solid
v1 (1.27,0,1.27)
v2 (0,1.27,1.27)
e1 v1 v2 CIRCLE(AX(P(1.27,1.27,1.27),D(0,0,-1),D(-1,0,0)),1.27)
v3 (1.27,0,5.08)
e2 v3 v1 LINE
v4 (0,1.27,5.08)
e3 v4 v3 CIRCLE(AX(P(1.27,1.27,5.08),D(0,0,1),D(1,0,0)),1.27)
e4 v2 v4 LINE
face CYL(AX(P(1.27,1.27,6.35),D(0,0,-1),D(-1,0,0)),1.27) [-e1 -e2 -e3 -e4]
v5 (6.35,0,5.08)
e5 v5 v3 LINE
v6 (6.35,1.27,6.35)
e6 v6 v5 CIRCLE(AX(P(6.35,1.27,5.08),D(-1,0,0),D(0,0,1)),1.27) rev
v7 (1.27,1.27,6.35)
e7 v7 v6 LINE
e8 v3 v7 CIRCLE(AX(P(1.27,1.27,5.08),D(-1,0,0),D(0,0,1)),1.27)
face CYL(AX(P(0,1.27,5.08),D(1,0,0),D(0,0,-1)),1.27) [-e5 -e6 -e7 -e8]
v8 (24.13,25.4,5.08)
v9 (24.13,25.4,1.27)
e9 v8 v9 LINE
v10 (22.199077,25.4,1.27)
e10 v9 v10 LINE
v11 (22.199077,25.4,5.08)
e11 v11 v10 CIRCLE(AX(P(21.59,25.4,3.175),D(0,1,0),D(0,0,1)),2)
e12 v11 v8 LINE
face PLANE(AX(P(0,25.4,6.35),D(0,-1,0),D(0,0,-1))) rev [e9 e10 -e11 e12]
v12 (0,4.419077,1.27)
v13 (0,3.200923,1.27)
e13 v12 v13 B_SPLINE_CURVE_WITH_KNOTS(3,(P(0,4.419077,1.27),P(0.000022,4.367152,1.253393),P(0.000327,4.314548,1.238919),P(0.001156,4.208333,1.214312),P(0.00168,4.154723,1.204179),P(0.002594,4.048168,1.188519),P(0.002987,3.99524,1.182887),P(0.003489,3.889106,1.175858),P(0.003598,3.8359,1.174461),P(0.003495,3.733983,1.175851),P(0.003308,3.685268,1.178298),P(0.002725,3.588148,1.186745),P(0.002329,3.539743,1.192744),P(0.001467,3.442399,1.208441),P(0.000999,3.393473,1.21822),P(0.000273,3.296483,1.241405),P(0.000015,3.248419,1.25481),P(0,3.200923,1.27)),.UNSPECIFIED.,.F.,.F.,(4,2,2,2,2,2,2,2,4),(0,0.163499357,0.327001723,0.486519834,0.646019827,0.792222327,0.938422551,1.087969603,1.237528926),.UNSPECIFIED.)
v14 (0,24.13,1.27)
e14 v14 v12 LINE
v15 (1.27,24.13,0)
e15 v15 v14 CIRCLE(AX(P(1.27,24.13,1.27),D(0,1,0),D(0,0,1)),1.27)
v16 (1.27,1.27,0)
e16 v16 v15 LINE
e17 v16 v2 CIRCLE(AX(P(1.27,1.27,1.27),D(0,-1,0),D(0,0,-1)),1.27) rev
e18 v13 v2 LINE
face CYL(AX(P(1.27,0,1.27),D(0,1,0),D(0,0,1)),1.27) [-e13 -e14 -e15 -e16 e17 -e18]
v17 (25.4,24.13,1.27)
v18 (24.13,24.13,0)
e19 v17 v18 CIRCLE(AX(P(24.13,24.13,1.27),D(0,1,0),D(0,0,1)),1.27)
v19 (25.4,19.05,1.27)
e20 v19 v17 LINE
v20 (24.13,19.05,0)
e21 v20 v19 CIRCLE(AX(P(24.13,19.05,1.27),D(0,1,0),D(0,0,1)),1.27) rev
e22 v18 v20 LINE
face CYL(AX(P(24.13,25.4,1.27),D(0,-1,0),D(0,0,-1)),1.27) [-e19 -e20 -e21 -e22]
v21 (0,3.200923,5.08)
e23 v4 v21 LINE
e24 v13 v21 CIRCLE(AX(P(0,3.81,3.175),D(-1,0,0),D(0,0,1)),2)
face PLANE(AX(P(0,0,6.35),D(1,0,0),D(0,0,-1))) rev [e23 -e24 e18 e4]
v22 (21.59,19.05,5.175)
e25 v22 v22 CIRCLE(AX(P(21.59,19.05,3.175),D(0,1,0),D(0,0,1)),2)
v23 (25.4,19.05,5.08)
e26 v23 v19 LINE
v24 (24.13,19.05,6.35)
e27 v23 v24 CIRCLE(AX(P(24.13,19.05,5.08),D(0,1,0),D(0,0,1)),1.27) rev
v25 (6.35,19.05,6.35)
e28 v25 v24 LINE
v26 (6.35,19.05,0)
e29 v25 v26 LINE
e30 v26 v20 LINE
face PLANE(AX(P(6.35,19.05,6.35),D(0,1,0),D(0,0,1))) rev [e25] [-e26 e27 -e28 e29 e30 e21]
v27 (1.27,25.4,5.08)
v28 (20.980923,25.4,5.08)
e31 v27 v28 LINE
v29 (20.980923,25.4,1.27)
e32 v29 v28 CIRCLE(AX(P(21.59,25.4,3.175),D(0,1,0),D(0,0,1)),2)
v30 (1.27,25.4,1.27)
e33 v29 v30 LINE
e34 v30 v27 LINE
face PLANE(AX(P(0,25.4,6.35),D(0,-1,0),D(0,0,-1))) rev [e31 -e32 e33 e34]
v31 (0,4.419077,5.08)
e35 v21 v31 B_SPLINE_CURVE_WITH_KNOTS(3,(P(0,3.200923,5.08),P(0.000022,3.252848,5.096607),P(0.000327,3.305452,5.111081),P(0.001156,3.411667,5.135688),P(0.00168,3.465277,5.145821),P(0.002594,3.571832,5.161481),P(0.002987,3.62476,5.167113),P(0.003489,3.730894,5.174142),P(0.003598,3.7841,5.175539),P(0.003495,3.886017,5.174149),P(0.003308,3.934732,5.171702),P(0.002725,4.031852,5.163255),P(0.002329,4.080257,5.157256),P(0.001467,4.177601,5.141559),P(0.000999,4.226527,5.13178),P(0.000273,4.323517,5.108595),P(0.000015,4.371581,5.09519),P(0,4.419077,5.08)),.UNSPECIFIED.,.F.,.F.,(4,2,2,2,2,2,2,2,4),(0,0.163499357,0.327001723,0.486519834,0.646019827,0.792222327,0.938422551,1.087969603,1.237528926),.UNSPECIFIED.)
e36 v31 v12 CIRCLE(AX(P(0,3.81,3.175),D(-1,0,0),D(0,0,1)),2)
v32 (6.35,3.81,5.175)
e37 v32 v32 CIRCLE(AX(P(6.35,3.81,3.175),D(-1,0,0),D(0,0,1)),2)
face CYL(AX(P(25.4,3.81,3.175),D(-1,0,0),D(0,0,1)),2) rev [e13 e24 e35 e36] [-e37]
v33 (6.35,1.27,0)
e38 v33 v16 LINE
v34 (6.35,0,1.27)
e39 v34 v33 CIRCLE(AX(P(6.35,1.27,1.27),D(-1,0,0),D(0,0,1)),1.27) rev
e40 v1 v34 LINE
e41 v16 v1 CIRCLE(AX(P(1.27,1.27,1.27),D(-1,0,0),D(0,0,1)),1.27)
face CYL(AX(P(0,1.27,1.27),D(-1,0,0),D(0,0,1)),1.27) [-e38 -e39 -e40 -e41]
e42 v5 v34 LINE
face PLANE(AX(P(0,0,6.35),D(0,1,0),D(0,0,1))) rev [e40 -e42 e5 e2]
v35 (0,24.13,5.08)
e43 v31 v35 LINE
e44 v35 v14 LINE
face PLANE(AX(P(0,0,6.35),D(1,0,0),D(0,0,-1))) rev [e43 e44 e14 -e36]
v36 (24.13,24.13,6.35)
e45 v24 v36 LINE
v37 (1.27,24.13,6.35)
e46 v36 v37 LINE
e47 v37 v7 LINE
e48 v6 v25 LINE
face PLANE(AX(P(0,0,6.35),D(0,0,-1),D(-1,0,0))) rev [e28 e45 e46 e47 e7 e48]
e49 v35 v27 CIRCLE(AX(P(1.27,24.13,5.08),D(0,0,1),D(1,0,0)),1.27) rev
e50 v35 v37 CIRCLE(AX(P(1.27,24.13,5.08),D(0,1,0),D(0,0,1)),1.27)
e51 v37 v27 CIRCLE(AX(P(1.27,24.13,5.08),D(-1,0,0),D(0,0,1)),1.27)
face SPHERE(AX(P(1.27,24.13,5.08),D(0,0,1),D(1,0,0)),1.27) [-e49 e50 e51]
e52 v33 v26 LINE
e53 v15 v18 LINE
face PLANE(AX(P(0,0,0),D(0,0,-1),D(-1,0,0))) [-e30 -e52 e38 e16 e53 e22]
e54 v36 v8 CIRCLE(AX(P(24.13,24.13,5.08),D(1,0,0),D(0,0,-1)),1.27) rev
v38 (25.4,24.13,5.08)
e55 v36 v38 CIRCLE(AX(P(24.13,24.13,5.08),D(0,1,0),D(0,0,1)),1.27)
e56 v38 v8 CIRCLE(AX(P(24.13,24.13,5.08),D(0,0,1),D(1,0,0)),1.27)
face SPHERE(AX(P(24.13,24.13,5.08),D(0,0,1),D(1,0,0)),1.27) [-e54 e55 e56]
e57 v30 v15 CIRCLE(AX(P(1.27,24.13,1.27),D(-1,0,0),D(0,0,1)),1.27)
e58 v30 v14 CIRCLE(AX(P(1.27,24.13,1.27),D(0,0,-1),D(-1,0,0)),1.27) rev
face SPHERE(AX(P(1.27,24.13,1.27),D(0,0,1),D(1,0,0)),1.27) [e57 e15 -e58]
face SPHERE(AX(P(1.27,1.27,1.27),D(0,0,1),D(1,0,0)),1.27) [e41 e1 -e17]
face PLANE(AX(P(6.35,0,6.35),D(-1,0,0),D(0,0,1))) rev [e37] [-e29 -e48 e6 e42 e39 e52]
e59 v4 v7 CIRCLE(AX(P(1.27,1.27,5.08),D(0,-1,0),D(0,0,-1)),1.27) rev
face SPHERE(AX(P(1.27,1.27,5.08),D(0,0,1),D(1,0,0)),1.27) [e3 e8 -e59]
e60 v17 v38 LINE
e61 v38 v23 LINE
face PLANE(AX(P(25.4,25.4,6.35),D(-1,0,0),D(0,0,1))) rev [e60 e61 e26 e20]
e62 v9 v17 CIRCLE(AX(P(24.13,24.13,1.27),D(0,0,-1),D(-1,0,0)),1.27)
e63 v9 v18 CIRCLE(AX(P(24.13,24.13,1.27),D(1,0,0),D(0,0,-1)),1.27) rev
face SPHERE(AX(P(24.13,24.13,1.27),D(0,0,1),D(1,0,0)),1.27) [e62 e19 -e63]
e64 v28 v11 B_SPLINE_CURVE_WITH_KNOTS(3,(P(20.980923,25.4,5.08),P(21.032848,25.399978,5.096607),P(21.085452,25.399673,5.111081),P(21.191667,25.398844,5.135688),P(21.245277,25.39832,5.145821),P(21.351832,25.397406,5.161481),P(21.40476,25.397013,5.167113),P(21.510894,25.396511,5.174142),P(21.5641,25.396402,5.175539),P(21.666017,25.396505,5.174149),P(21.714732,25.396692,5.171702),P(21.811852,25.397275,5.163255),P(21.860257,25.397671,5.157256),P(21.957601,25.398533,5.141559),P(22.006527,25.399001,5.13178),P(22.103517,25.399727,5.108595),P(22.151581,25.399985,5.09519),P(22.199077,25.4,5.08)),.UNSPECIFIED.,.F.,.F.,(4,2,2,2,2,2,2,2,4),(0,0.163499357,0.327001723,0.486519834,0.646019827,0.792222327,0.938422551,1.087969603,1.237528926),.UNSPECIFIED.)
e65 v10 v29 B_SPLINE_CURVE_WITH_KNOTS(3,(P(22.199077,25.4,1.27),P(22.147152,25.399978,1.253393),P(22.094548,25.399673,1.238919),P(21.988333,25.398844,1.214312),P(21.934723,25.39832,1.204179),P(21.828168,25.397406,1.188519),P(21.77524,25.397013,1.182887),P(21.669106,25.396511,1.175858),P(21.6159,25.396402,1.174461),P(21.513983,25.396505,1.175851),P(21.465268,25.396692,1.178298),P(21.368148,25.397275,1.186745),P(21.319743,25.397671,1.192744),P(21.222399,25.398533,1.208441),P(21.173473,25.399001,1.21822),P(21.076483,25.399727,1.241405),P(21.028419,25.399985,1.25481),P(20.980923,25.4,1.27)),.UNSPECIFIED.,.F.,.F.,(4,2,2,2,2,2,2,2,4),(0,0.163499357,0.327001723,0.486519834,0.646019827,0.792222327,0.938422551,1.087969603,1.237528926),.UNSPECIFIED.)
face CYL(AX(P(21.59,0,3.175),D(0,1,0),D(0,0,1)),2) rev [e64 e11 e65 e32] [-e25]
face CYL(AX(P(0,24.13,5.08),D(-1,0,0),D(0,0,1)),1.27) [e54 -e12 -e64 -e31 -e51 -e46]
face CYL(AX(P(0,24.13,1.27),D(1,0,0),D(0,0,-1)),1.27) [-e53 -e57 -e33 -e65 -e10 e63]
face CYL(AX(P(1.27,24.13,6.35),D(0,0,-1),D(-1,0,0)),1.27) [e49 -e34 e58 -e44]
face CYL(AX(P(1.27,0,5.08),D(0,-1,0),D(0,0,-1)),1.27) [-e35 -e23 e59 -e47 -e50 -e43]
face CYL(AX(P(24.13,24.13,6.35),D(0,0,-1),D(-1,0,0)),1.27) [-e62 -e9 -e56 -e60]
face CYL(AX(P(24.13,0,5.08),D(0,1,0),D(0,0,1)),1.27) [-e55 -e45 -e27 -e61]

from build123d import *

# Parameters (mm, degrees)
BOSS_EXTRUDE1_DEPTH = 6.35
SKETCH2_R           = 2
CUT_EXTRUDE1_DEPTH  = 37.477972806
SKETCH3_R           = 2
CUT_EXTRUDE2_DEPTH  = 37.477972806
FILLET1_R           = 1.27


with BuildPart() as part:
    # Sketch1 → Boss-Extrude1 (new body)
    with BuildSketch(Plane.XY):
        Polygon((0, 0), (6.35, 0), (6.35, 19.05), (25.4, 19.05), (25.4, 25.4), (0, 25.4), align=None)
    extrude(amount=BOSS_EXTRUDE1_DEPTH)

    # Sketch2 → Cut-Extrude1 (cut, through all)
    with BuildSketch(Plane(origin=(0, 25.4, 0), x_dir=(1, 0, 0), z_dir=(0, 1, 0))):
        with Locations(Location((21.59, -3.175, 0), (0, 0, 270))):
            Circle(SKETCH2_R)
    extrude(amount=-CUT_EXTRUDE1_DEPTH, mode=Mode.SUBTRACT)

    # Sketch3 → Cut-Extrude2 (cut, through all)
    with BuildSketch(Plane.ZY):
        with Locations((3.175, 3.81)):
            Circle(SKETCH3_R)
    extrude(amount=-CUT_EXTRUDE2_DEPTH, mode=Mode.SUBTRACT)

    # Fillet1
    # the kernel refuses this fillet: 1.27 mm, written as the material it takes off along each edge
    with BuildSketch(Plane(origin=(1.27, 24.13, 1.27), x_dir=(0, 0, -1), z_dir=(-1, 0, 0))) as fillet1_piece_1_section:
        Polygon((0, 0), (FILLET1_R, 0), (FILLET1_R, -FILLET1_R), (0, -FILLET1_R), align=None)
    fillet1_piece_1 = extrude(amount=FILLET1_R, mode=Mode.PRIVATE)
    fillet1_piece_1 = fillet1_piece_1 - Plane(origin=(1.27, 24.13, 1.27), x_dir=(0, -0.7071067811865475, 0.7071067811865475), z_dir=(-1, 0, 0)) * Sphere(FILLET1_R, mode=Mode.PRIVATE)
    add(fillet1_piece_1, mode=Mode.SUBTRACT)
    with BuildSketch(Plane(origin=(1.27, 24.13, 5.08), x_dir=(0, 0, 1), z_dir=(-1, 0, 0))) as fillet1_piece_2_section:
        Polygon((0, 0), (FILLET1_R, 0), (FILLET1_R, FILLET1_R), (0, FILLET1_R), align=None)
    fillet1_piece_2 = extrude(amount=FILLET1_R, mode=Mode.PRIVATE)
    fillet1_piece_2 = fillet1_piece_2 - Plane(origin=(1.27, 24.13, 5.08), x_dir=(0, -0.7071067811865475, -0.7071067811865475), z_dir=(-1, 0, 0)) * Sphere(FILLET1_R, mode=Mode.PRIVATE)
    add(fillet1_piece_2, mode=Mode.SUBTRACT)
    with BuildSketch(Plane(origin=(24.13, 24.13, 1.27), x_dir=(0, 0, -1), z_dir=(1, 0, 0))) as fillet1_piece_3_section:
        Polygon((0, 0), (FILLET1_R, 0), (FILLET1_R, FILLET1_R), (0, FILLET1_R), align=None)
    fillet1_piece_3 = extrude(amount=FILLET1_R, mode=Mode.PRIVATE)
    fillet1_piece_3 = fillet1_piece_3 - Plane(origin=(24.13, 24.13, 1.27), x_dir=(0, -0.7071067811865475, 0.7071067811865475), z_dir=(1, 0, 0)) * Sphere(FILLET1_R, mode=Mode.PRIVATE)
    add(fillet1_piece_3, mode=Mode.SUBTRACT)
    with BuildSketch(Plane(origin=(24.13, 24.13, 5.08), x_dir=(0, 0, 1), z_dir=(1, 0, 0))) as fillet1_piece_4_section:
        Polygon((0, 0), (FILLET1_R, 0), (FILLET1_R, -FILLET1_R), (0, -FILLET1_R), align=None)
    fillet1_piece_4 = extrude(amount=FILLET1_R, mode=Mode.PRIVATE)
    fillet1_piece_4 = fillet1_piece_4 - Plane(origin=(24.13, 24.13, 5.08), x_dir=(0, -0.7071067811865475, -0.7071067811865475), z_dir=(1, 0, 0)) * Sphere(FILLET1_R, mode=Mode.PRIVATE)
    add(fillet1_piece_4, mode=Mode.SUBTRACT)
    with BuildSketch(Plane(origin=(1.27, 1.27, 1.27), x_dir=(-1, 0, 0), z_dir=(0, -1, 0))) as fillet1_piece_5_section:
        Polygon((0, 0), (FILLET1_R, 0), (FILLET1_R, FILLET1_R), (0, FILLET1_R), align=None)
    fillet1_piece_5 = extrude(amount=FILLET1_R, mode=Mode.PRIVATE)
    fillet1_piece_5 = fillet1_piece_5 - Plane(origin=(1.27, 1.27, 1.27), x_dir=(0.7071067811865475, 0, 0.7071067811865475), z_dir=(0, -1, 0)) * Sphere(FILLET1_R, mode=Mode.PRIVATE)
    add(fillet1_piece_5, mode=Mode.SUBTRACT)
    with BuildSketch(Plane(origin=(1.27, 1.27, 5.08), x_dir=(-1, 0, 0), z_dir=(0, -1, 0))) as fillet1_piece_6_section:
        Polygon((0, 0), (FILLET1_R, 0), (FILLET1_R, -FILLET1_R), (0, -FILLET1_R), align=None)
    fillet1_piece_6 = extrude(amount=FILLET1_R, mode=Mode.PRIVATE)
    fillet1_piece_6 = fillet1_piece_6 - Plane(origin=(1.27, 1.27, 5.08), x_dir=(0.7071067811865475, 0, -0.7071067811865475), z_dir=(0, -1, 0)) * Sphere(FILLET1_R, mode=Mode.PRIVATE)
    add(fillet1_piece_6, mode=Mode.SUBTRACT)
    with BuildSketch(Plane(origin=(0, 25.4, 1.27), x_dir=(0, -1, 0), z_dir=(0, 0, 1)), Plane(origin=(25.4, 25.4, 1.27), x_dir=(-1, 0, 0), z_dir=(0, 0, 1)), Plane(origin=(0, 0, 1.27), x_dir=(1, 0, 0), z_dir=(0, 0, 1))) as fillet1_piece_7:
        with BuildLine():
            CenterArc((FILLET1_R, FILLET1_R), FILLET1_R, 180, 90)
            Line((0, FILLET1_R), (0, 0))
            Line((0, 0), (FILLET1_R, 0))
        make_face()
    extrude(amount=3.81, mode=Mode.SUBTRACT)
    with BuildSketch(Plane(origin=(25.4, 15.875, 6.35), x_dir=(-1, 0, 0), z_dir=(0, 1, 0)), Plane(origin=(1.27, 0, 0), x_dir=(0, 0, 1), z_dir=(1, 0, 0))) as fillet1_piece_8:
        with BuildLine():
            CenterArc((FILLET1_R, -FILLET1_R), FILLET1_R, 90, 90)
            Line((0, -FILLET1_R), (0, 0))
            Line((0, 0), (FILLET1_R, 0))
        make_face()
    extrude(amount=8.255, mode=Mode.SUBTRACT)
    with BuildSketch(Plane(origin=(24.13, 25.4, 6.35), x_dir=(0, -1, 0), z_dir=(-1, 0, 0)), Plane(origin=(0, 24.13, 0), x_dir=(0, 0, 1), z_dir=(0, -1, 0))) as fillet1_piece_9:
        with BuildLine():
            CenterArc((FILLET1_R, -FILLET1_R), FILLET1_R, 90, 90)
            Line((0, -FILLET1_R), (0, 0))
            Line((0, 0), (FILLET1_R, 0))
        make_face()
    extrude(amount=22.86, mode=Mode.SUBTRACT)
    with BuildSketch(Plane(origin=(0, 24.13, 6.35), x_dir=(0, 0, -1), z_dir=(0, -1, 0)), Plane(origin=(24.13, 25.4, 0), x_dir=(0, -1, 0), z_dir=(-1, 0, 0))) as fillet1_piece_10:
        with BuildLine():
            CenterArc((FILLET1_R, FILLET1_R), FILLET1_R, 180, 90)
            Line((0, FILLET1_R), (0, 0))
            Line((0, 0), (FILLET1_R, 0))
        make_face()
    extrude(amount=22.86, mode=Mode.SUBTRACT)
    with BuildSketch(Plane(origin=(25.4, 15.875, 0), x_dir=(-1, 0, 0), z_dir=(0, 1, 0)), Plane(origin=(1.27, 0, 6.35), x_dir=(0, 0, -1), z_dir=(1, 0, 0))) as fillet1_piece_11:
        with BuildLine():
            CenterArc((FILLET1_R, FILLET1_R), FILLET1_R, 180, 90)
            Line((0, FILLET1_R), (0, 0))
            Line((0, 0), (FILLET1_R, 0))
        make_face()
    extrude(amount=8.255, mode=Mode.SUBTRACT)


solid = part.part
